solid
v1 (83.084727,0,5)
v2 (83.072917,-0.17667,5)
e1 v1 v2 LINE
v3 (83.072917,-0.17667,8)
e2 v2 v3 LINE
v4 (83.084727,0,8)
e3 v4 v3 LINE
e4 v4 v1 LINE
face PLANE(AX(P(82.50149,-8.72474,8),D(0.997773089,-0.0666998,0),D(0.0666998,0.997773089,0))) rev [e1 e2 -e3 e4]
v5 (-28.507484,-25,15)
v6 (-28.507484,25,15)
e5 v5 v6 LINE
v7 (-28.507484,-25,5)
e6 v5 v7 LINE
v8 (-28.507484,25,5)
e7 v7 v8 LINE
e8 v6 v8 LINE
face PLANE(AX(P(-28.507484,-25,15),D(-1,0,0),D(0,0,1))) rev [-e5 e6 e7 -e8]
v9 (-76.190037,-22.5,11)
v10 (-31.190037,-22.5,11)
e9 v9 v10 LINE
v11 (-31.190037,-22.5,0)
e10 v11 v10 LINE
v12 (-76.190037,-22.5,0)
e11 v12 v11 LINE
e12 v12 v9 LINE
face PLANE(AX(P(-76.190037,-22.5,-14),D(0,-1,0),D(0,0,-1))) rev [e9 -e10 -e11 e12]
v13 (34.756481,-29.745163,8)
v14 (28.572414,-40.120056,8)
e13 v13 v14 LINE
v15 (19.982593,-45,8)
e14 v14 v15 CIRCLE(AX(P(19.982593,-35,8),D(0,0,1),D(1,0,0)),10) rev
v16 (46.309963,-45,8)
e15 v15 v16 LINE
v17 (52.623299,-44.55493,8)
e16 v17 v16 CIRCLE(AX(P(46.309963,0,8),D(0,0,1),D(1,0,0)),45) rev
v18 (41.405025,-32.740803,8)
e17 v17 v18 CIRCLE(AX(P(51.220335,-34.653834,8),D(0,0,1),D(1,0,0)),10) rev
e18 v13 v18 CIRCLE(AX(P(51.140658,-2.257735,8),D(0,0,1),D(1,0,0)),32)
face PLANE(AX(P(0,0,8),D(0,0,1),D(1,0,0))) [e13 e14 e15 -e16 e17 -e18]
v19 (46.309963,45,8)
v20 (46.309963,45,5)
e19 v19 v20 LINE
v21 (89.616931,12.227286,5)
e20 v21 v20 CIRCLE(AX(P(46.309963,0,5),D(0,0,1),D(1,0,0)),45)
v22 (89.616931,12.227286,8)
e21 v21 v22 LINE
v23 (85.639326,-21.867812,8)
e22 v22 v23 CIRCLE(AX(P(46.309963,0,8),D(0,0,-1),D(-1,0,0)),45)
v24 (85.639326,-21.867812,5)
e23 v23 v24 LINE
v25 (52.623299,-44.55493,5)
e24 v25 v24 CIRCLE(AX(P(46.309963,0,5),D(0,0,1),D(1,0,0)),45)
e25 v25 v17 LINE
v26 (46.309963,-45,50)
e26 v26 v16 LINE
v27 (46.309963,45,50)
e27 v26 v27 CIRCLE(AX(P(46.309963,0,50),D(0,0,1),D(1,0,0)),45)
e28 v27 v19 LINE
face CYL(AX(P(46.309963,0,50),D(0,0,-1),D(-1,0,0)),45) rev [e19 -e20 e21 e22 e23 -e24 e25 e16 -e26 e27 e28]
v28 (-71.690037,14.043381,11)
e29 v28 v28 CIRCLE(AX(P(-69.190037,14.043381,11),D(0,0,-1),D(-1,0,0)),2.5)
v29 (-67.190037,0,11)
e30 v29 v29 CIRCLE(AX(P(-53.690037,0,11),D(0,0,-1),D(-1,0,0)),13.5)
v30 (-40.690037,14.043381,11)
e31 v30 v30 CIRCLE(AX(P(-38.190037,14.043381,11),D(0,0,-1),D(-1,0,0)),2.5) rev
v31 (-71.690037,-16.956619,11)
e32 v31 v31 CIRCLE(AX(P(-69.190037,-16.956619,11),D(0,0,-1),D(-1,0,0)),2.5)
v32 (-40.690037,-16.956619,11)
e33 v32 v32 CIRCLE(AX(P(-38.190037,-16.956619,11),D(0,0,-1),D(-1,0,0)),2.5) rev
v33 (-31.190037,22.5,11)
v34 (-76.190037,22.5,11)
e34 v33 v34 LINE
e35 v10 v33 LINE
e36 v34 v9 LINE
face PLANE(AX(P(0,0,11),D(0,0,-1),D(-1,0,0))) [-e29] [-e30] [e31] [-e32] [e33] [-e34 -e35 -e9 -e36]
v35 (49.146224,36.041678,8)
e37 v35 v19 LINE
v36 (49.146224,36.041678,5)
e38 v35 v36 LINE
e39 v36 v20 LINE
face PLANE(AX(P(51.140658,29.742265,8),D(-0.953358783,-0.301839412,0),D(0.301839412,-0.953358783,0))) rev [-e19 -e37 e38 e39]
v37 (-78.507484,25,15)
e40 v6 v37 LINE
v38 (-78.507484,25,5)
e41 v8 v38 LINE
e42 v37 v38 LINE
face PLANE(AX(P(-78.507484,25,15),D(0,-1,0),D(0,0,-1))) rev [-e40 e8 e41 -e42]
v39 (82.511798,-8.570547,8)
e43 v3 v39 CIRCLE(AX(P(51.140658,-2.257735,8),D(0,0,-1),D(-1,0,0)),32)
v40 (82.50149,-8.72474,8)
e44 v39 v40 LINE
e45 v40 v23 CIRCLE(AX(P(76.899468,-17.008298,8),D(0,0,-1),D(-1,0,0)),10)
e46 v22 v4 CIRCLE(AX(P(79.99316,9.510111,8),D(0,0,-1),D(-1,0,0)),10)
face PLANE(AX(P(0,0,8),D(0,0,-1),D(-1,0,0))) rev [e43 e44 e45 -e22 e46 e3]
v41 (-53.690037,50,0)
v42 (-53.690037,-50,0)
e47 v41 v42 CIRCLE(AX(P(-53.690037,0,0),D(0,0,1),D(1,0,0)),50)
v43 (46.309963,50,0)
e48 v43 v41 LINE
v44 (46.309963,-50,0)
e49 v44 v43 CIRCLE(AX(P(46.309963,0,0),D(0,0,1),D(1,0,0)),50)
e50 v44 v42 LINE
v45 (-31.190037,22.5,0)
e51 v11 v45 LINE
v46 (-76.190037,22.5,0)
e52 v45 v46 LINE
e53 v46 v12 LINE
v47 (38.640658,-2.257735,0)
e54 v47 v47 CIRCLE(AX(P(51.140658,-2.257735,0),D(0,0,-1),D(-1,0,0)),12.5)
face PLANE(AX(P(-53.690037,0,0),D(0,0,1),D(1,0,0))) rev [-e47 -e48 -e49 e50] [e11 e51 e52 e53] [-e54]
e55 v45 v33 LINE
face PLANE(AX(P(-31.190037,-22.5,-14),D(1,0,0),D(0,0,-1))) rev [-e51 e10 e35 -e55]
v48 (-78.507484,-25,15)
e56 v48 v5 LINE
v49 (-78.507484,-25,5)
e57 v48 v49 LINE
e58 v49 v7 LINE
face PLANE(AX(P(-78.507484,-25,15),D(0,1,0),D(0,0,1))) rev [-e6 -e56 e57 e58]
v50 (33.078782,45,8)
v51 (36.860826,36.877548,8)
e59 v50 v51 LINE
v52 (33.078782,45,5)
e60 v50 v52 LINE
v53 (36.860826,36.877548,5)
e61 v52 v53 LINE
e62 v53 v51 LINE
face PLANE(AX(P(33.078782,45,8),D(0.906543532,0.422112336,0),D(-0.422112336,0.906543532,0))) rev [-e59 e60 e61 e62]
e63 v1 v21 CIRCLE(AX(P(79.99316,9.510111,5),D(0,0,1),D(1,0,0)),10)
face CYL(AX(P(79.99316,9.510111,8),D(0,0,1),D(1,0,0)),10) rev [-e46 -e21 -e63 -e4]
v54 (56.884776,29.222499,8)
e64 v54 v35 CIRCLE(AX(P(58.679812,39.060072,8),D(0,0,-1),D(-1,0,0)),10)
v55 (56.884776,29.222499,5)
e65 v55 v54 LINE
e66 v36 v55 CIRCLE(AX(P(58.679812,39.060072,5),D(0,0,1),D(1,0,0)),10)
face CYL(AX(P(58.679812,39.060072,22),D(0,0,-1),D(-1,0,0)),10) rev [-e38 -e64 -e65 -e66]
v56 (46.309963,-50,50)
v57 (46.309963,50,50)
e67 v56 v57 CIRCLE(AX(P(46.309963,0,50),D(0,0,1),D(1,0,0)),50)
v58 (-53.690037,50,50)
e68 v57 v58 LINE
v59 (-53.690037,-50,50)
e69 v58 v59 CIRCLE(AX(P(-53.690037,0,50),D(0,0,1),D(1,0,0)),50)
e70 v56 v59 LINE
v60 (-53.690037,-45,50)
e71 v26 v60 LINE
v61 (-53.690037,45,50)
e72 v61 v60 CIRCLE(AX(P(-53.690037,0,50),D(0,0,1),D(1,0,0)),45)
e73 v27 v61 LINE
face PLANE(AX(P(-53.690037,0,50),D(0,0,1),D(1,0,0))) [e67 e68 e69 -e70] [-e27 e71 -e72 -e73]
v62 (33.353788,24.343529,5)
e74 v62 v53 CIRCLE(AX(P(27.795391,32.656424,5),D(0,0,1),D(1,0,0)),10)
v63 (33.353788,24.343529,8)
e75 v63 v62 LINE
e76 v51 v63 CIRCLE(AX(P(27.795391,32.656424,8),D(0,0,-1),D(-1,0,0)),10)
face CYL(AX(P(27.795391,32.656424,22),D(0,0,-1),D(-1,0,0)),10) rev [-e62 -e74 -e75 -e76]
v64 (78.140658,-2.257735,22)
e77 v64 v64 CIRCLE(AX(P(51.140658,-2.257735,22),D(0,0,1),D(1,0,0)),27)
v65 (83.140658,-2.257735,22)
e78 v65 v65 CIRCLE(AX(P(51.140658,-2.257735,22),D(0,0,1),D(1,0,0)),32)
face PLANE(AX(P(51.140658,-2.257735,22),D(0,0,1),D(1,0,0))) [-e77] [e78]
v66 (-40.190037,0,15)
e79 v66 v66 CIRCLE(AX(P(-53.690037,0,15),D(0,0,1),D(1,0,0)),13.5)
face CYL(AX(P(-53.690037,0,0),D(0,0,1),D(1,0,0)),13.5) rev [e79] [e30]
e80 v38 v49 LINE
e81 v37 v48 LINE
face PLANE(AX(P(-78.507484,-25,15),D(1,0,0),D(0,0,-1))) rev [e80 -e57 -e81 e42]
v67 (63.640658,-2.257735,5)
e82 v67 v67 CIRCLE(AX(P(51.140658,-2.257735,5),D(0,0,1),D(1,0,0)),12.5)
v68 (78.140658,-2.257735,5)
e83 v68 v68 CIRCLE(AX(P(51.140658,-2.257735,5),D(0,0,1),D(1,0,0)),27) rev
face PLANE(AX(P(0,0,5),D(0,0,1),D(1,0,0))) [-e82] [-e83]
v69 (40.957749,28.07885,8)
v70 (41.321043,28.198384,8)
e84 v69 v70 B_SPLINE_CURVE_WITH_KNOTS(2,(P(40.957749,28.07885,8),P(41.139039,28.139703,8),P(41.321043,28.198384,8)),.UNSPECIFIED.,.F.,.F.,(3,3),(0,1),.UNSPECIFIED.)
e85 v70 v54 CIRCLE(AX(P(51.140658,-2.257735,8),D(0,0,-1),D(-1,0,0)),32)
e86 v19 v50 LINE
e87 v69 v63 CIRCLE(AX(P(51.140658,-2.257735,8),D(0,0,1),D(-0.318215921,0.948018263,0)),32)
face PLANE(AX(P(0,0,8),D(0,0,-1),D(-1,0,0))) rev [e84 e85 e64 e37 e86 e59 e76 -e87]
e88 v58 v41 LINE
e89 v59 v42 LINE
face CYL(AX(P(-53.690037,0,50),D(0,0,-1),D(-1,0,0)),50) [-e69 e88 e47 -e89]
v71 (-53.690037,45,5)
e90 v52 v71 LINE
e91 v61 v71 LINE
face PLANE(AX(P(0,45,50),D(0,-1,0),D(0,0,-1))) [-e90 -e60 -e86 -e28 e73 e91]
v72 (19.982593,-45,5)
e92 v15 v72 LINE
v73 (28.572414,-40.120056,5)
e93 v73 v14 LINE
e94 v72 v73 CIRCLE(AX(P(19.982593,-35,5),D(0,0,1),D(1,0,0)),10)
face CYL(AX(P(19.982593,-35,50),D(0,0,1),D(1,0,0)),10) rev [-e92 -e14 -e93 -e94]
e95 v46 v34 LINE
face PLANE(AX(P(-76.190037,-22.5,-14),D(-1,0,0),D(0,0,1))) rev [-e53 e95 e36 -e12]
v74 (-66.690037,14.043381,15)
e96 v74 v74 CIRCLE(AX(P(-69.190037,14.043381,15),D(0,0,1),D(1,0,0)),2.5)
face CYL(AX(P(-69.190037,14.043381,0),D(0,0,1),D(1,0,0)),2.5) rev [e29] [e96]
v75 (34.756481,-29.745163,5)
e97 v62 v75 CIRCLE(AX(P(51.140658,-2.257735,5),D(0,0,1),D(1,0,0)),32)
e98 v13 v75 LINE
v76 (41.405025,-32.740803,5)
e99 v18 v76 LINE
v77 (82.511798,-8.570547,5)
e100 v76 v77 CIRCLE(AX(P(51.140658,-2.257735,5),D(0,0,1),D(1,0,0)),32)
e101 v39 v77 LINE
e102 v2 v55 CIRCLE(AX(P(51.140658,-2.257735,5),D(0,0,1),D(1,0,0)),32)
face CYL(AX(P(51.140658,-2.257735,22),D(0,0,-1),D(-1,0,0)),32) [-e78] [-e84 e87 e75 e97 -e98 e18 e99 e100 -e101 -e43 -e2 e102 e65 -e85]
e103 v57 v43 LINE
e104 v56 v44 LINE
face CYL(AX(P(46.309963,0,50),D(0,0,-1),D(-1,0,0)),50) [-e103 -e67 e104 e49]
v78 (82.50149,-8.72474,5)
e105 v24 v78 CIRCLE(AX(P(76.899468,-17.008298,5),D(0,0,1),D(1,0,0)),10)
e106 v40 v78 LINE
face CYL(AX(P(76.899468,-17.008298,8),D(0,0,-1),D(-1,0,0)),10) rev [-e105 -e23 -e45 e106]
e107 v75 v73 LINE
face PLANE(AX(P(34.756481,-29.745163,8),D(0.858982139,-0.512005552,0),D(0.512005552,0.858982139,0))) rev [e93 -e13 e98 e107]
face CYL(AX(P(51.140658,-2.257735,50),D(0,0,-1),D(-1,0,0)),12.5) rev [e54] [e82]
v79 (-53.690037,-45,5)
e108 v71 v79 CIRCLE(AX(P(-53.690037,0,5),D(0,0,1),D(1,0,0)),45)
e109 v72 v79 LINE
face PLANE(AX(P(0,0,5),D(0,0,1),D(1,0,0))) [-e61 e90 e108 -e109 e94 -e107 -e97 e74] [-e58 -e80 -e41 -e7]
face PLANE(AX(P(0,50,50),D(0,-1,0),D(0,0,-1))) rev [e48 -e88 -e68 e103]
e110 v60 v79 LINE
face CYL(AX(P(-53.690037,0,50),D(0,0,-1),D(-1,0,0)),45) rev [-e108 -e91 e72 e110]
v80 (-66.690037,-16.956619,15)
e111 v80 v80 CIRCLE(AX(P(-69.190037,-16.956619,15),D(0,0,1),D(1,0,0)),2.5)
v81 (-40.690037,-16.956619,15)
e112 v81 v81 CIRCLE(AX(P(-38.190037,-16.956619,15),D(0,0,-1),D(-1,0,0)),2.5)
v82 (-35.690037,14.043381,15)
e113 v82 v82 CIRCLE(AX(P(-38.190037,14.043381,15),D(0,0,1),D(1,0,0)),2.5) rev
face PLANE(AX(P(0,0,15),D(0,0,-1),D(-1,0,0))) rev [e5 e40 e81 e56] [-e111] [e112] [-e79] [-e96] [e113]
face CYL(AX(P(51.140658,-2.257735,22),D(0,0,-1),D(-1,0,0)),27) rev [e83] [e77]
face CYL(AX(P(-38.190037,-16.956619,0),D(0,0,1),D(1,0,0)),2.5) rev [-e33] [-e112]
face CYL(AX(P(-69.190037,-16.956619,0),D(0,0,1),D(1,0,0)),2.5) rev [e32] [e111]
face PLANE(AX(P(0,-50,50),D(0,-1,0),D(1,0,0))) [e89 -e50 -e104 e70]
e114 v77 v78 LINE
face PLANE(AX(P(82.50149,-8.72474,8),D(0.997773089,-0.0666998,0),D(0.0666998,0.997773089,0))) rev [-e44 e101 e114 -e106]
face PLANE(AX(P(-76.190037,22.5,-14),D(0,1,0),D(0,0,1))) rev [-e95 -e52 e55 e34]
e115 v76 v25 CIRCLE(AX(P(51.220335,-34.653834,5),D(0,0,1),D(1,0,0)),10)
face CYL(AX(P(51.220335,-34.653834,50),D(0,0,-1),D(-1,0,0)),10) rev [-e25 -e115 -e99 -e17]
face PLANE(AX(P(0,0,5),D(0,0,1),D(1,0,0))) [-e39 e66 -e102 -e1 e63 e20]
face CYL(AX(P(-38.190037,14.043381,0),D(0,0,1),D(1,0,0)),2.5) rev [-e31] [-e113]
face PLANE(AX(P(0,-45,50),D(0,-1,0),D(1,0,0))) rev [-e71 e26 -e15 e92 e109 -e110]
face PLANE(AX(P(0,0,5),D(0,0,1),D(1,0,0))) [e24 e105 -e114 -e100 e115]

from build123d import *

# Parameters (mm, degrees)
EXTRUDE_THIN1_DEPTH  = 50
BOSS_EXTRUDE1_DEPTH  = 5
SKETCH5_R            = 32
SKETCH5_R_2          = 27
EXTRUDE_THIN4_DEPTH  = 17
SKETCH2_R            = 12.5
CUT_EXTRUDE2_DEPTH   = 126.505472998
BOSS_EXTRUDE4_DEPTH  = 3
FILLET1_R            = 10
FILLET2_R            = 10
BOSS_EXTRUDE5_DEPTH  = 3
FILLET3_R            = 10
FILLET4_R            = 10
BOSS_EXTRUDE11_DEPTH = 3
FILLET6_R            = 10
FILLET7_R            = 10
SKETCH14_W           = 50
SKETCH14_H           = 50
BOSS_EXTRUDE12_DEPTH = 10
CUT_EXTRUDE5_START   = -4
SKETCH16_W           = 45
SKETCH16_H           = 45
SKETCH16_R           = 13.5
SKETCH16_R_2         = 2.5
CUT_EXTRUDE5_DEPTH   = 25
SKETCH16_2_R         = 2.5
SKETCH16_2_R_2       = 13.5
CUT_EXTRUDE6_DEPTH   = 121.318842051


with BuildPart() as part:
    # Sketch1 → Extrude-Thin1 (new body)
    with BuildSketch(Plane.XY):
        with BuildLine():
            Line((-53.6900369, 50), (46.3099631, 50))
            ThreePointArc((46.3099631, 50), (96.3099631, 0), (46.3099631, -50))
            Line((46.3099631, -50), (-53.6900369, -50))
            ThreePointArc((-53.6900369, -50), (-103.6900369, 0), (-53.6900369, 50))
        make_face()
        with BuildLine():
            Line((-53.6900369, 45), (46.3099631, 45))
            ThreePointArc((46.3099631, 45), (91.3099631, 0), (46.3099631, -45))
            Line((46.3099631, -45), (-53.6900369, -45))
            ThreePointArc((-53.6900369, -45), (-98.6900369, 0), (-53.6900369, 45))
        make_face(mode=Mode.SUBTRACT)
    extrude(amount=EXTRUDE_THIN1_DEPTH)

    # Sketch1<3> → Boss-Extrude1 (add)
    with BuildSketch(Plane.XY):
        with BuildLine():
            Line((-53.6900369, -45), (46.3099631, -45))
            ThreePointArc((46.3099631, -45), (91.3099631, 0), (46.3099631, 45))
            Line((46.3099631, 45), (-53.6900369, 45))
            ThreePointArc((-53.6900369, 45), (-98.6900369, 0), (-53.6900369, -45))
        make_face()
    extrude(amount=BOSS_EXTRUDE1_DEPTH)

    # Sketch5 → Extrude-Thin4 (add)
    with BuildSketch(Plane.XY.offset(5)):
        with Locations((51.14065821, -2.257734505)):
            Circle(SKETCH5_R)
        with Locations((51.14065821, -2.257734505)):
            Circle(SKETCH5_R_2, mode=Mode.SUBTRACT)
    extrude(amount=EXTRUDE_THIN4_DEPTH)

    # Sketch2 → Cut-Extrude2 (cut, through all)
    with BuildSketch(Plane(origin=(0, 0, 0), x_dir=(-1, 0, 0), z_dir=(0, 0, -1))):
        with Locations((-51.14065821, -2.257734505)):
            Circle(SKETCH2_R)
    extrude(amount=-CUT_EXTRUDE2_DEPTH, mode=Mode.SUBTRACT)

    # Sketch10 → Boss-Extrude4 (add)
    with BuildSketch(Plane.XY.offset(5)):
        Polygon((51.14065821, 29.742265495), (46.3099631, 45), (33.078782173, 45), (40.95774875, 28.078849927), (41.321043385, 28.19838417), align=None)
    extrude(amount=BOSS_EXTRUDE4_DEPTH)

    # Fillet1
    fillet1_edges = [part.edges().sort_by_distance(p)[0] for p in [
        (40.95774875, 28.078849927, 6.5),
    ]]
    fillet(fillet1_edges, radius=FILLET1_R)

    # Fillet2
    fillet2_edges = [part.edges().sort_by_distance(p)[0] for p in [
        (51.14065821, 29.742265495, 6.5),
    ]]
    fillet(fillet2_edges, radius=FILLET2_R)

    # Sketch11 → Boss-Extrude5 (add)
    with BuildSketch(Plane.XY.offset(5)):
        Polygon((34.756480548, -29.745162946), (25.663670683, -45), (38.486673363, -45), (41.405025332, -32.740802796), align=None)
    extrude(amount=BOSS_EXTRUDE5_DEPTH)

    # Fillet3
    # the kernel refuses this fillet: 10 mm, written as the material it adds along each edge
    with BuildSketch(Plane(origin=(38.486673363, -45, 5), x_dir=(0.9995047638701084, 0.03146787252037754, 0), z_dir=(0, 0, 1))) as fillet3_piece_1:
        with BuildLine():
            CenterArc((13.052927583, 9.940340464), FILLET3_R, 167.167880579, 109.093840461)
            Line((3.302677551, 12.161291679), (2.327652547, 12.3833868))
            ThreePointArc((2.327652547, 12.3833868), (0.686292727, 6.342726217), (-0.965046048, 0.262080378))
            Line((-0.965046048, 0.262080378), (-0.031467873, -0.999504764))
            ThreePointArc((-0.031467873, -0.999504764), (7.787947488, -1.245687048), (14.252700085, -0.994034046))
            Line((14.252700085, -0.994034046), (14.143629858, 0))
        make_face()
    extrude(amount=3)

    # Fillet4
    fillet4_edges = [part.edges().sort_by_distance(p)[0] for p in [
        (25.663670683, -45, 6.5),
    ]]
    fillet(fillet4_edges, radius=FILLET4_R)

    # Sketch13 → Boss-Extrude11 (add)
    with BuildSketch(Plane.XY.offset(5)):
        Polygon((90.705735304, -8.724739526), (82.501490248, -8.724739526), (83.084727444, 0), (91.667524575, 0), align=None)
    extrude(amount=BOSS_EXTRUDE11_DEPTH)

    # Fillet6
    # the kernel refuses this fillet: 10 mm, written as the material it adds along each edge
    with BuildSketch(Plane(origin=(91.3099631, 0, 8), x_dir=(-0.13715489744354328, 0.9905496121382569, 0), z_dir=(0, 0, -1))) as fillet6_piece_1:
        with BuildLine():
            CenterArc((10.972391795, -9.905496121), FILLET6_R, 82.116754313, 87.758074962)
            Line((1.128131353, -8.147503989), (0.931246144, -8.112344146))
            ThreePointArc((0.931246144, -8.112344146), (0.365955754, -4.101182974), (-0.198109922, -0.027430979))
            Line((-0.198109922, -0.027430979), (-0.027430979, 0.198109922))
            ThreePointArc((-0.027430979, 0.198109922), (6.171970385, 0.625267454), (12.371371749, 0.198109922))
            Line((12.371371749, 0.198109922), (12.34394077, 0))
        make_face()
    extrude(amount=3)

    # Fillet7
    # the kernel refuses this fillet: 10 mm, written as the material it adds along each edge
    with BuildSketch(Plane(origin=(90.456071877, -8.724739526, 8), x_dir=(-1, 0, 0), z_dir=(0, 0, -1))) as fillet7_piece_1:
        with BuildLine():
            CenterArc((13.556604147, -8.283558638), FILLET7_R, 124.06978595, 85.005036852)
            Line((4.816745681, -13.1430724), (4.641948512, -13.240262675))
            ThreePointArc((4.641948512, -13.240262675), (1.706415001, -6.828793582), (-0.196204928, -0.03877662))
            Line((-0.196204928, -0.03877662), (0, 0.2))
            ThreePointArc((0, 0.2), (3.977290815, 0.2), (7.842541179, 0.165671173))
            Line((7.842541179, 0.165671173), (7.95458163, 0))
        make_face()
    extrude(amount=3)

    # Sketch14 → Boss-Extrude12 (add)
    with BuildSketch(Plane.XY.offset(5)):
        with Locations((-53.507483995, 0)):
            Rectangle(SKETCH14_W, SKETCH14_H)
    extrude(amount=BOSS_EXTRUDE12_DEPTH)

    # Sketch16 → Cut-Extrude5 (cut)
    with BuildSketch(Plane.XY.offset(15).offset(CUT_EXTRUDE5_START)):
        with Locations((-53.6900369, 0)):
            Rectangle(SKETCH16_W, SKETCH16_H)
        with Locations((-53.6900369, 0)):
            Circle(SKETCH16_R, mode=Mode.SUBTRACT)
        with Locations((-69.1900369, 14.04338148)):
            Circle(SKETCH16_R_2, mode=Mode.SUBTRACT)
        with Locations((-69.1900369, -16.95661852)):
            Circle(SKETCH16_R_2, mode=Mode.SUBTRACT)
        with Locations((-38.1900369, -16.95661852)):
            Circle(SKETCH16_R_2, mode=Mode.SUBTRACT)
        with Locations((-38.1900369, 14.04338148)):
            Circle(SKETCH16_R_2, mode=Mode.SUBTRACT)
    extrude(amount=-CUT_EXTRUDE5_DEPTH, mode=Mode.SUBTRACT)

    # Sketch16<2> → Cut-Extrude6 (cut, through all)
    with BuildSketch(Plane.XY.offset(15)):
        with Locations((-38.1900369, 14.04338148)):
            Circle(SKETCH16_2_R)
        with Locations((-69.1900369, 14.04338148)):
            Circle(SKETCH16_2_R)
        with Locations((-53.6900369, 0)):
            Circle(SKETCH16_2_R_2)
        with Locations((-69.1900369, -16.95661852)):
            Circle(SKETCH16_2_R)
        with Locations(Location((-38.1900369, -16.95661852, 0), (0, 0, 180))):
            Circle(SKETCH16_2_R)
    extrude(amount=-CUT_EXTRUDE6_DEPTH, mode=Mode.SUBTRACT)


solid = part.part
